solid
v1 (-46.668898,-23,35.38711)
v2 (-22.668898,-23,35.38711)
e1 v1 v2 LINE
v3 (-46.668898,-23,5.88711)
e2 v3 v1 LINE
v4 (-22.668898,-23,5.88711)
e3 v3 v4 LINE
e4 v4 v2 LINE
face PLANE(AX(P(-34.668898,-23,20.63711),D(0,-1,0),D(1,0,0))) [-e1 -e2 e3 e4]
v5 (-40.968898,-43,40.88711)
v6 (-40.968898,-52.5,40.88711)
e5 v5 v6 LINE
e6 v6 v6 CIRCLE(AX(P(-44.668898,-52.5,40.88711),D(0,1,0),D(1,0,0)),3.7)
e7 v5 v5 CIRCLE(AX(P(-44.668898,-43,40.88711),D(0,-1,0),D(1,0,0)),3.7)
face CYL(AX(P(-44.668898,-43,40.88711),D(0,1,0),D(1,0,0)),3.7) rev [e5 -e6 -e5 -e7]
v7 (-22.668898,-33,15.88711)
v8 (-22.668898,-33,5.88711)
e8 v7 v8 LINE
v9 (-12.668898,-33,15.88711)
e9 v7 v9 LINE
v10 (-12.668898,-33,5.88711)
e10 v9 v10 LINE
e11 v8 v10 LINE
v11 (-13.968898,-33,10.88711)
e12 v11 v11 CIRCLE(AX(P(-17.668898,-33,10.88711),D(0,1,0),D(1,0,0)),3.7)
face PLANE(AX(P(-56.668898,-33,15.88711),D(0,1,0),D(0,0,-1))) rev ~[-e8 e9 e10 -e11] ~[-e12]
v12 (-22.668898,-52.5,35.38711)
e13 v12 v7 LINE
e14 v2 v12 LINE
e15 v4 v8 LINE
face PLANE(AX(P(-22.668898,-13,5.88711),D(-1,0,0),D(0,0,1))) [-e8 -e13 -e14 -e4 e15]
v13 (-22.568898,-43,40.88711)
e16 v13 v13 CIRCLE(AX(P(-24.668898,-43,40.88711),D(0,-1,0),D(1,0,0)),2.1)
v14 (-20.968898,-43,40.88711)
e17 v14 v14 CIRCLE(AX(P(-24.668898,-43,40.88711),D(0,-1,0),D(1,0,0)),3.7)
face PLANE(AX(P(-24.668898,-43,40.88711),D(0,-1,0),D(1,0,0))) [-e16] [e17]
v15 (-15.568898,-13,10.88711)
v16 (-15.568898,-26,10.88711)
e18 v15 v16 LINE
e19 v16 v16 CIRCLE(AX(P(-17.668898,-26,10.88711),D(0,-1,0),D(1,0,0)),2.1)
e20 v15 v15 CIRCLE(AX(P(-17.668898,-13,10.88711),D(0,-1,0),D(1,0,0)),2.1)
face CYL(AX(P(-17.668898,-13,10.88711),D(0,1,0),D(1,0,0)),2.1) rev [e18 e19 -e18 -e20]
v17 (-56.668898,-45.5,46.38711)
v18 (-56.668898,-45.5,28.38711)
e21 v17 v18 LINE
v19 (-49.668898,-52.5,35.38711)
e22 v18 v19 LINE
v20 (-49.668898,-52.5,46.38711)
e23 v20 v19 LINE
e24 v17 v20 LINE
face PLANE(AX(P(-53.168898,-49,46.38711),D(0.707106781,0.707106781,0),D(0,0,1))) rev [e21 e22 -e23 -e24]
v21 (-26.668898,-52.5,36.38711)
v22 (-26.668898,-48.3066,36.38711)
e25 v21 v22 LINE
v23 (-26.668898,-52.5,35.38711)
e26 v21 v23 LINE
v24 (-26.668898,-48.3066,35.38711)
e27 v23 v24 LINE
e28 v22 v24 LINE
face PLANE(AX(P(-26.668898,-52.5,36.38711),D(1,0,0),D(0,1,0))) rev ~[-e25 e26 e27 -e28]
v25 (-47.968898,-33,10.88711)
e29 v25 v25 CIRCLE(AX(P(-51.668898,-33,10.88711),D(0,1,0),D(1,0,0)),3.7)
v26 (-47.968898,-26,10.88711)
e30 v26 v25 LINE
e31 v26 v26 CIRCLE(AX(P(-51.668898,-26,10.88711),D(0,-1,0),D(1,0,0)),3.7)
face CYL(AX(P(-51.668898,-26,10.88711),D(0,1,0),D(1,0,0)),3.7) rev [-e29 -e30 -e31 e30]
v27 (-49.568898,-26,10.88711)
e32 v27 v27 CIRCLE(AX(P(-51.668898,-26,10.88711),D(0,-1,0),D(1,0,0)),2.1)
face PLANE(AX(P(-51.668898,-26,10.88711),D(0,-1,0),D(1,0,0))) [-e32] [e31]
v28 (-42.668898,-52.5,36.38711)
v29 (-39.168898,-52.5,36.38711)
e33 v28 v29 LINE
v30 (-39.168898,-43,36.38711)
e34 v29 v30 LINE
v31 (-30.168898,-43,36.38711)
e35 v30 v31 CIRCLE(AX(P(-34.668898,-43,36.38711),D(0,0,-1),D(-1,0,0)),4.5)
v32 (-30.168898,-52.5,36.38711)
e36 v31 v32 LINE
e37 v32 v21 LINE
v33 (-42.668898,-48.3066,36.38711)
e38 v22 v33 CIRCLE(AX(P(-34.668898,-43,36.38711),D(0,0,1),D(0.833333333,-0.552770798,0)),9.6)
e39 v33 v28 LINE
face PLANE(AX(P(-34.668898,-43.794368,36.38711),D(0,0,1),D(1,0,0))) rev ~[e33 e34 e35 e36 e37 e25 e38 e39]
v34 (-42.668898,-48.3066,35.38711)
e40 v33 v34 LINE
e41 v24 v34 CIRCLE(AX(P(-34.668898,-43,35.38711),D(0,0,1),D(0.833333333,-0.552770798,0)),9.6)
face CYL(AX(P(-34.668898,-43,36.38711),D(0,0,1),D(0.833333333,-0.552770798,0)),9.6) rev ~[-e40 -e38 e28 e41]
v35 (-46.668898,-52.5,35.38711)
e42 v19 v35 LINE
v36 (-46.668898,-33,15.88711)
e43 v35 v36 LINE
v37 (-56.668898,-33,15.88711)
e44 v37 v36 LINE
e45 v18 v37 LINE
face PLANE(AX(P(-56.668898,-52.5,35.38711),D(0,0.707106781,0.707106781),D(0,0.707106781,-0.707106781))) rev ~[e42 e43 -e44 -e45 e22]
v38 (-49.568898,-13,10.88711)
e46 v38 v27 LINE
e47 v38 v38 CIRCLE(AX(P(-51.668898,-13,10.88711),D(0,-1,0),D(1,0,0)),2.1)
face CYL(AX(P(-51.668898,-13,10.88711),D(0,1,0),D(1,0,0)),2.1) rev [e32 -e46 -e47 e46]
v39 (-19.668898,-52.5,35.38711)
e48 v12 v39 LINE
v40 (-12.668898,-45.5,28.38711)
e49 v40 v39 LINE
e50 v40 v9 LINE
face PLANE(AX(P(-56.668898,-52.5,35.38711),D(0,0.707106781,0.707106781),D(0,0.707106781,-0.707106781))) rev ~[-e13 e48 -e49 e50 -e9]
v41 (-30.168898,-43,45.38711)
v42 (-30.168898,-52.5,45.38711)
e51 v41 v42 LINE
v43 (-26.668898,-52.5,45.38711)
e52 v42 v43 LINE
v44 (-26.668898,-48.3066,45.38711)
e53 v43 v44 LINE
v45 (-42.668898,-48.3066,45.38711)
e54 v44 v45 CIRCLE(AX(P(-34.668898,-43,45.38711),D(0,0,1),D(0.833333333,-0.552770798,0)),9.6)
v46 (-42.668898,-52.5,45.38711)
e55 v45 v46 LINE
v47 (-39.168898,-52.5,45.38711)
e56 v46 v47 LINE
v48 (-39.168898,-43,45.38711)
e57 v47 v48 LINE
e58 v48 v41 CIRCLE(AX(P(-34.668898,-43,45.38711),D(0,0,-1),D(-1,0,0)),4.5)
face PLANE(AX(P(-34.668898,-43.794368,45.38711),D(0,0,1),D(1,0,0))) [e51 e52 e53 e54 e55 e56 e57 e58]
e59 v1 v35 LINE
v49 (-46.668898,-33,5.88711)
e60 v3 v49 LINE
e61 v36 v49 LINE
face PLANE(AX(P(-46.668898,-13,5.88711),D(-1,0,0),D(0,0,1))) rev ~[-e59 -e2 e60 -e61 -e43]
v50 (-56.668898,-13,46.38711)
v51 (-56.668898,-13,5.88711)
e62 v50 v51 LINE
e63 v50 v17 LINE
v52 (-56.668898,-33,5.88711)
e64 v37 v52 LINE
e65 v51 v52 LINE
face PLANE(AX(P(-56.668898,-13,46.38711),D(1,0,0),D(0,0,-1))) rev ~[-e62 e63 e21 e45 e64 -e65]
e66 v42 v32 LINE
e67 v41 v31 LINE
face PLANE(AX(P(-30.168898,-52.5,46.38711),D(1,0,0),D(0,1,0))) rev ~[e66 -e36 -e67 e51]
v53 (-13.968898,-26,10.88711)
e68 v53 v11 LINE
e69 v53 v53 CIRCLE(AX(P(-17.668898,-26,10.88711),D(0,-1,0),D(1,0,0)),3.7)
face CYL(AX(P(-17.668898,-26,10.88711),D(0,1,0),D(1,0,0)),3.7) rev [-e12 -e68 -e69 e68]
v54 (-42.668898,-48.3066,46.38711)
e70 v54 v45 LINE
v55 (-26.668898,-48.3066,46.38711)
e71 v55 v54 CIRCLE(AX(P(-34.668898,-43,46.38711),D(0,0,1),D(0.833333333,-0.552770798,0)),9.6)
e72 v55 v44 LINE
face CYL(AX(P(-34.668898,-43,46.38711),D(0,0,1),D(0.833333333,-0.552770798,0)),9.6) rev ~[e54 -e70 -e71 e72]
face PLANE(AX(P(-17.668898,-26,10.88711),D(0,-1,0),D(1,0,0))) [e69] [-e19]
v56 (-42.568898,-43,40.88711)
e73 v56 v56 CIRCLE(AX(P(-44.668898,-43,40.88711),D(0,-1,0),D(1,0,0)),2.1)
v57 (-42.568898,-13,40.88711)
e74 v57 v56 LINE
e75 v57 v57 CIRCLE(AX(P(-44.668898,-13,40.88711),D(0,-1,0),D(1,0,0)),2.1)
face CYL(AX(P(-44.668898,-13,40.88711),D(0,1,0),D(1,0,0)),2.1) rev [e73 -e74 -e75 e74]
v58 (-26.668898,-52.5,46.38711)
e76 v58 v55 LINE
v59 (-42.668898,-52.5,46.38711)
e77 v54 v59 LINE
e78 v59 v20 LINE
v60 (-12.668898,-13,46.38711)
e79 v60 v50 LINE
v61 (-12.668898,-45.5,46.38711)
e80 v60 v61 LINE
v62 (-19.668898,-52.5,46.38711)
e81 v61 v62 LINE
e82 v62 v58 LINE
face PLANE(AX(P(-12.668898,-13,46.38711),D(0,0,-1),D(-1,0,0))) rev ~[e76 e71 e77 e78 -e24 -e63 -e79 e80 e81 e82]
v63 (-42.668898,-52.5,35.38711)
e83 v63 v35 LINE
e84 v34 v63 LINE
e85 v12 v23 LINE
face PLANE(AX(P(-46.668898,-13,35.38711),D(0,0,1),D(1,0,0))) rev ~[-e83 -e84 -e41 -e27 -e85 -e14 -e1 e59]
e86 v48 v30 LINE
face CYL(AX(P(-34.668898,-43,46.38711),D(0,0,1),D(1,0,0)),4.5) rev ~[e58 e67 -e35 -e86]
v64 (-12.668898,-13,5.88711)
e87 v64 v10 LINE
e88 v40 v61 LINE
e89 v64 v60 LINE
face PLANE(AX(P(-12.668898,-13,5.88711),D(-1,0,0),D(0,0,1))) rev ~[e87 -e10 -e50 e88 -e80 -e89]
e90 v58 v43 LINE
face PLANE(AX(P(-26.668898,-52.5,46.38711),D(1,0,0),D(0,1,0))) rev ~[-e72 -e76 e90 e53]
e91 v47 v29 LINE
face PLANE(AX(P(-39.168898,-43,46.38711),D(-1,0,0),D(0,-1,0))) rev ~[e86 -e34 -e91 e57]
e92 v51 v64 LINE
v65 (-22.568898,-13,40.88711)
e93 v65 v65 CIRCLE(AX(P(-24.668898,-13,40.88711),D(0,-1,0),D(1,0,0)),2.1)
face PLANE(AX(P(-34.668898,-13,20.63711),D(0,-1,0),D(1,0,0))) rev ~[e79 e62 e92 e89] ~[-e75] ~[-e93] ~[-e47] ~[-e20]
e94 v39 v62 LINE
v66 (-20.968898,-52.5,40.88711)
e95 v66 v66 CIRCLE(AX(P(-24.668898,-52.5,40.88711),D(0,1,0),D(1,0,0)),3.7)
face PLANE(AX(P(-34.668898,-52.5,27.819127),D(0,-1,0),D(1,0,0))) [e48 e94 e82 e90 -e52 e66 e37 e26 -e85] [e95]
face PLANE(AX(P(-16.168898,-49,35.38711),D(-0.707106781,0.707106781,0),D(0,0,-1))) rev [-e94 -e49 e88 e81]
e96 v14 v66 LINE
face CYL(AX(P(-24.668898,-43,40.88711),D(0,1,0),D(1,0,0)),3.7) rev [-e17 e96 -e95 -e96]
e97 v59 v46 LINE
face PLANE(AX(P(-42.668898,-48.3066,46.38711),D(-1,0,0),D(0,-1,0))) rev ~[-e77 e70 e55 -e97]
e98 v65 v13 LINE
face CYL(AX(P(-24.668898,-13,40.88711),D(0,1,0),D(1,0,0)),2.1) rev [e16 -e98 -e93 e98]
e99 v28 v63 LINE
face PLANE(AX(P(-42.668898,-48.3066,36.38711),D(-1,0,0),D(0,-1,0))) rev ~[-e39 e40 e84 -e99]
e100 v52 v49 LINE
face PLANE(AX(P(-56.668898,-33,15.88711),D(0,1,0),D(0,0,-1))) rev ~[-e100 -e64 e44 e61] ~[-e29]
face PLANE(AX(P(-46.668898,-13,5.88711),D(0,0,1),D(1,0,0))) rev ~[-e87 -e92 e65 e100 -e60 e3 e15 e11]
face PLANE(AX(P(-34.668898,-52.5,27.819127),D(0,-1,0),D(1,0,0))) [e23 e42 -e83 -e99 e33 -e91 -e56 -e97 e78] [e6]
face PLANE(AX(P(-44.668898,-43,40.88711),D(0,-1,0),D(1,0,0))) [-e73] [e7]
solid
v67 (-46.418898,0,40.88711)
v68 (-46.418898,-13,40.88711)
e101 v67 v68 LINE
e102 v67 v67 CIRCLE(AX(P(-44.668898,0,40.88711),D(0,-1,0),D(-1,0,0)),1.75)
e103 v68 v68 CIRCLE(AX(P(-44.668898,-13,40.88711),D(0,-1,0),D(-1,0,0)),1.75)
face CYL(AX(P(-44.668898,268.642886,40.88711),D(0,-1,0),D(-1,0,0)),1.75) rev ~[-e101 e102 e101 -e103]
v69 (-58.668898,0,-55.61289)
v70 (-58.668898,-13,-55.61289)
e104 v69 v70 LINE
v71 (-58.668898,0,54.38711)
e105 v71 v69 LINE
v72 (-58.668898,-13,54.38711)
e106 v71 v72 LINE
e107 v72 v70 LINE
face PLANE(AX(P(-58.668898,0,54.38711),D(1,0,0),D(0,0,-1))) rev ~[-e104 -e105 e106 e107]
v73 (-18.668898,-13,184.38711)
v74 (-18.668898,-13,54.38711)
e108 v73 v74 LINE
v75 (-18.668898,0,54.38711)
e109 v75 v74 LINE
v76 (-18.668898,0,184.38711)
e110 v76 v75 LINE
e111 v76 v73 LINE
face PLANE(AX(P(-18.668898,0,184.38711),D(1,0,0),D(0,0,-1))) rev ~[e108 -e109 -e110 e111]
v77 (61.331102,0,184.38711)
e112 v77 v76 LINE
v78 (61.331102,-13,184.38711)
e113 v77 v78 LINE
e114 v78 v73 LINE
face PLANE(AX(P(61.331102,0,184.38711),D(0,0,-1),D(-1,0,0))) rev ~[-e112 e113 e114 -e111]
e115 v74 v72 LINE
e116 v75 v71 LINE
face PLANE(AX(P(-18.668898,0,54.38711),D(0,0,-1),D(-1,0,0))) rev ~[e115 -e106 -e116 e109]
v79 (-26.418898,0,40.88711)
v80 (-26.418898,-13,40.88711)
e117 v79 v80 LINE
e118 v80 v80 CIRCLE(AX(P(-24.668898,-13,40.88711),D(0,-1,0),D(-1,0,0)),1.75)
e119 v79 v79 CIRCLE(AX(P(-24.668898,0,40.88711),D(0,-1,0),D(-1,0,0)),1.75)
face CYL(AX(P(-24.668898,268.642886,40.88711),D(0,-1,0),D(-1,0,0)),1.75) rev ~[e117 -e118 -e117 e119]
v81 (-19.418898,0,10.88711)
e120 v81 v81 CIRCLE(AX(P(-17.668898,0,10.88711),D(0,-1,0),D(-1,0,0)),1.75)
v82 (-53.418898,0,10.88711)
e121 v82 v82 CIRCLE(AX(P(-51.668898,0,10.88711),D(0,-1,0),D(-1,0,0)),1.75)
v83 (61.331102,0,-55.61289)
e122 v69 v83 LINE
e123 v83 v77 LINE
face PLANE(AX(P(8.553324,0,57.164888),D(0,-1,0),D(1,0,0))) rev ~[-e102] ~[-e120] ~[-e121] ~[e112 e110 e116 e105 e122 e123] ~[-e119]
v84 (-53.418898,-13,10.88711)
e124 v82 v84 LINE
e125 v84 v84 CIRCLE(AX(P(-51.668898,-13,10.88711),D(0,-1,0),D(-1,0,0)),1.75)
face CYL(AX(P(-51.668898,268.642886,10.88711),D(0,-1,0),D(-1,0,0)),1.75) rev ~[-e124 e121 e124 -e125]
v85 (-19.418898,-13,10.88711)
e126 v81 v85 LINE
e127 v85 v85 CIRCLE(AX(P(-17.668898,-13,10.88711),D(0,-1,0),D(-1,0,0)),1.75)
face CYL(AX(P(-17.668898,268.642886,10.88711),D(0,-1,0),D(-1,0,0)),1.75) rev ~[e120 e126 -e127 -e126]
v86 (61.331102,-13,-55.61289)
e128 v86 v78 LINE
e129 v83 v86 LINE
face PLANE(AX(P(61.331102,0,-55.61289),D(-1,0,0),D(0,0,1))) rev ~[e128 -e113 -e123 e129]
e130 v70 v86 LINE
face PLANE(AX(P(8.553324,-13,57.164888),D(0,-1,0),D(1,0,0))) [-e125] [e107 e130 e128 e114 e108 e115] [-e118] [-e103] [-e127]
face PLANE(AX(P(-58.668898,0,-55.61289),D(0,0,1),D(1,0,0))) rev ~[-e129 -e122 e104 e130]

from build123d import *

# Parameters (mm, degrees)
F1_DEPTH  = 13
F2_D      = 3.5
F3_R      = 3.7
F3_W      = 24
F3_H      = 29.5
F3_R_2    = 2.1
F3_R_3    = 1.75
F4_DEPTH  = 39.5
F5_DEPTH  = 39.501
F6_START  = 30
F6_DEPTH  = 9.501
F7_START  = 13
F7_DEPTH  = 26.501
F9_DEPTH  = 10
F11_DEPTH = 118.001
F12_DEPTH = 102.001
F13_DEPTH = 1
F14_START = -10
F14_DEPTH = 92.001
F15_SIZE  = 7


with BuildPart() as f1:
    # F0 (on Front) → F1 (new body)
    with BuildSketch(Plane.XZ):
        Polygon((-18.6688979508, 54.3871098008), (-58.6688979508, 54.3871098008), (-58.6688979508, -55.6128901992), (61.3311020492, -55.6128901992), (61.3311020492, 184.3871098008), (-18.6688979508, 184.3871098008), align=None)
    extrude(amount=F1_DEPTH)

    # F2 (through all)
    with Locations(Plane(origin=(0, 0, 0), x_dir=(1, 0, 0), z_dir=(0, 1, 0))):
        with Locations((-44.6688979508, -40.8871098008), (-24.6688979508, -40.8871098008), (-51.6688979508, -10.8871098008), (-17.6688979508, -10.8871098008)):
            Hole(F2_D / 2)


with BuildPart() as f4:
    # F3 (on face) → F4 (new body)
    with BuildSketch(Plane.XZ.offset(13)):
        Polygon((-22.6688979508, 5.8871098008), (-12.6688979508, 5.8871098008), (-12.6688979508, 46.3871098008), (-56.6688979508, 46.3871098008), (-56.6688979508, 5.8871098008), (-46.6688979508, 5.8871098008), (-46.6688979508, 35.3871098008), (-22.6688979508, 35.3871098008), align=None)
        with Locations((-51.6688979508, 10.8871098008)):
            Circle(F3_R, mode=Mode.SUBTRACT)
        with Locations((-44.6688979508, 40.8871098008)):
            Circle(F3_R, mode=Mode.SUBTRACT)
        with Locations((-17.6688979508, 10.8871098008)):
            Circle(F3_R, mode=Mode.SUBTRACT)
        with Locations((-24.6688979508, 40.8871098008)):
            Circle(F3_R, mode=Mode.SUBTRACT)
        with Locations((-34.6688979508, 20.6371098008)):
            Rectangle(F3_W, F3_H)
        with Locations((-44.6688979508, 40.8871098008)):
            Circle(F3_R)
        with Locations((-44.6688979508, 40.8871098008)):
            Circle(F3_R_2, mode=Mode.SUBTRACT)
        with Locations((-24.6688979508, 40.8871098008)):
            Circle(F3_R)
        with Locations((-24.6688979508, 40.8871098008)):
            Circle(F3_R_2, mode=Mode.SUBTRACT)
        with Locations((-51.6688979508, 10.8871098008)):
            Circle(F3_R)
        with Locations((-51.6688979508, 10.8871098008)):
            Circle(F3_R_2, mode=Mode.SUBTRACT)
        with Locations((-17.6688979508, 10.8871098008)):
            Circle(F3_R)
        with Locations((-17.6688979508, 10.8871098008)):
            Circle(F3_R_2, mode=Mode.SUBTRACT)
        with Locations((-17.6688979508, 10.8871098008)):
            Circle(F3_R_2)
        with Locations((-17.6688979508, 10.8871098008)):
            Circle(F3_R_3, mode=Mode.SUBTRACT)
        with Locations((-51.6688979508, 10.8871098008)):
            Circle(F3_R_2)
        with Locations((-51.6688979508, 10.8871098008)):
            Circle(F3_R_3, mode=Mode.SUBTRACT)
        with Locations((-44.6688979508, 40.8871098008)):
            Circle(F3_R_2)
        with Locations((-44.6688979508, 40.8871098008)):
            Circle(F3_R_3, mode=Mode.SUBTRACT)
        with Locations((-24.6688979508, 40.8871098008)):
            Circle(F3_R_2)
        with Locations((-24.6688979508, 40.8871098008)):
            Circle(F3_R_3, mode=Mode.SUBTRACT)
    extrude(amount=F4_DEPTH)

    # F3 (on face) → F5 (cut, through all)
    with BuildSketch(Plane.XZ.offset(13)):
        with Locations((-34.6688979508, 20.6371098008)):
            Rectangle(F3_W, F3_H)
        with Locations((-17.6688979508, 10.8871098008)):
            Circle(F3_R_2)
        with Locations((-17.6688979508, 10.8871098008)):
            Circle(F3_R_3, mode=Mode.SUBTRACT)
        with Locations((-51.6688979508, 10.8871098008)):
            Circle(F3_R_2)
        with Locations((-51.6688979508, 10.8871098008)):
            Circle(F3_R_3, mode=Mode.SUBTRACT)
        with Locations((-44.6688979508, 40.8871098008)):
            Circle(F3_R_2)
        with Locations((-44.6688979508, 40.8871098008)):
            Circle(F3_R_3, mode=Mode.SUBTRACT)
        with Locations((-24.6688979508, 40.8871098008)):
            Circle(F3_R_2)
        with Locations((-24.6688979508, 40.8871098008)):
            Circle(F3_R_3, mode=Mode.SUBTRACT)
    extrude(amount=F5_DEPTH, mode=Mode.SUBTRACT)

    # F3 (on face) → F6 (cut)
    with BuildSketch(Plane.XZ.offset(13).offset(F6_START)):
        with Locations((-44.6688979508, 40.8871098008)):
            Circle(F3_R)
        with Locations((-44.6688979508, 40.8871098008)):
            Circle(F3_R_2, mode=Mode.SUBTRACT)
        with Locations((-24.6688979508, 40.8871098008)):
            Circle(F3_R)
        with Locations((-24.6688979508, 40.8871098008)):
            Circle(F3_R_2, mode=Mode.SUBTRACT)
    extrude(amount=F6_DEPTH, mode=Mode.SUBTRACT)

    # F3 (on face) → F7 (cut)
    with BuildSketch(Plane.XZ.offset(13).offset(F7_START)):
        with Locations((-17.6688979508, 10.8871098008)):
            Circle(F3_R)
        with Locations((-17.6688979508, 10.8871098008)):
            Circle(F3_R_2, mode=Mode.SUBTRACT)
        with Locations((-51.6688979508, 10.8871098008)):
            Circle(F3_R)
        with Locations((-51.6688979508, 10.8871098008)):
            Circle(F3_R_2, mode=Mode.SUBTRACT)
    extrude(amount=F7_DEPTH, mode=Mode.SUBTRACT)

    # F3 (on face) → F9 (join)
    with BuildSketch(Plane.XZ.offset(13)):
        with Locations((-34.6688979508, 20.6371098008)):
            Rectangle(F3_W, F3_H)
        with Locations((-51.6688979508, 10.8871098008)):
            Circle(F3_R)
        with Locations((-51.6688979508, 10.8871098008)):
            Circle(F3_R_2, mode=Mode.SUBTRACT)
        with Locations((-17.6688979508, 10.8871098008)):
            Circle(F3_R)
        with Locations((-17.6688979508, 10.8871098008)):
            Circle(F3_R_2, mode=Mode.SUBTRACT)
    extrude(amount=F9_DEPTH)

    # F10 (on face) → F11 (cut, through all)
    with BuildSketch(Plane(origin=(-56.6688979508, 0, 0), x_dir=(0, -1, 0), z_dir=(-1, 0, 0))):
        Polygon((52.5, 5.8871098008), (52.5, 35.3871098008), (33, 15.8871098008), (33, 5.8871098008), align=None)
    extrude(amount=-F11_DEPTH, mode=Mode.SUBTRACT)

    # F8 (on face) → F12 (cut, through all)
    with BuildSketch(Plane.XY.offset(46.3871098008)):
        with BuildLine():
            Line((-39.1688979508, -52.5), (-30.1688979508, -52.5))
            Line((-30.1688979508, -52.5), (-30.1688979508, -43))
            ThreePointArc((-30.1688979508, -43), (-34.6688979508, -38.5), (-39.1688979508, -43))
            Line((-39.1688979508, -43), (-39.1688979508, -52.5))
        make_face()
    extrude(amount=-F12_DEPTH, mode=Mode.SUBTRACT)

    # F8 (on face) → F13 (cut)
    with BuildSketch(Plane.XY.offset(46.3871098008)):
        with BuildLine():
            Line((-26.6688979508, -52.5), (-26.6688979508, -48.3065996646))
            ThreePointArc((-26.6688979508, -48.3065996646), (-34.6688979508, -33.4), (-42.6688979508, -48.3065996646))
            Line((-42.6688979508, -48.3065996646), (-42.6688979508, -52.5))
            Line((-42.6688979508, -52.5), (-39.1688979508, -52.5))
            Line((-39.1688979508, -52.5), (-39.1688979508, -43))
            ThreePointArc((-39.1688979508, -43), (-34.6688979508, -38.5), (-30.1688979508, -43))
            Line((-30.1688979508, -43), (-30.1688979508, -52.5))
            Line((-30.1688979508, -52.5), (-26.6688979508, -52.5))
        make_face()
    extrude(amount=-F13_DEPTH, mode=Mode.SUBTRACT)

    # F8 (on face) → F14 (cut)
    with BuildSketch(Plane.XY.offset(46.3871098008).offset(F14_START)):
        with BuildLine():
            Line((-26.6688979508, -52.5), (-26.6688979508, -48.3065996646))
            ThreePointArc((-26.6688979508, -48.3065996646), (-34.6688979508, -33.4), (-42.6688979508, -48.3065996646))
            Line((-42.6688979508, -48.3065996646), (-42.6688979508, -52.5))
            Line((-42.6688979508, -52.5), (-39.1688979508, -52.5))
            Line((-39.1688979508, -52.5), (-39.1688979508, -43))
            ThreePointArc((-39.1688979508, -43), (-34.6688979508, -38.5), (-30.1688979508, -43))
            Line((-30.1688979508, -43), (-30.1688979508, -52.5))
            Line((-30.1688979508, -52.5), (-26.6688979508, -52.5))
        make_face()
    extrude(amount=-F14_DEPTH, mode=Mode.SUBTRACT)

    # F15
    f15_edges = [f4.edges().sort_by_distance(p)[0] for p in [
        (-56.668898, -52.5, 40.88711),
        (-12.668898, -52.5, 40.88711),
    ]]
    chamfer(f15_edges, length=F15_SIZE)


solid = Compound([f1.part, f4.part])
